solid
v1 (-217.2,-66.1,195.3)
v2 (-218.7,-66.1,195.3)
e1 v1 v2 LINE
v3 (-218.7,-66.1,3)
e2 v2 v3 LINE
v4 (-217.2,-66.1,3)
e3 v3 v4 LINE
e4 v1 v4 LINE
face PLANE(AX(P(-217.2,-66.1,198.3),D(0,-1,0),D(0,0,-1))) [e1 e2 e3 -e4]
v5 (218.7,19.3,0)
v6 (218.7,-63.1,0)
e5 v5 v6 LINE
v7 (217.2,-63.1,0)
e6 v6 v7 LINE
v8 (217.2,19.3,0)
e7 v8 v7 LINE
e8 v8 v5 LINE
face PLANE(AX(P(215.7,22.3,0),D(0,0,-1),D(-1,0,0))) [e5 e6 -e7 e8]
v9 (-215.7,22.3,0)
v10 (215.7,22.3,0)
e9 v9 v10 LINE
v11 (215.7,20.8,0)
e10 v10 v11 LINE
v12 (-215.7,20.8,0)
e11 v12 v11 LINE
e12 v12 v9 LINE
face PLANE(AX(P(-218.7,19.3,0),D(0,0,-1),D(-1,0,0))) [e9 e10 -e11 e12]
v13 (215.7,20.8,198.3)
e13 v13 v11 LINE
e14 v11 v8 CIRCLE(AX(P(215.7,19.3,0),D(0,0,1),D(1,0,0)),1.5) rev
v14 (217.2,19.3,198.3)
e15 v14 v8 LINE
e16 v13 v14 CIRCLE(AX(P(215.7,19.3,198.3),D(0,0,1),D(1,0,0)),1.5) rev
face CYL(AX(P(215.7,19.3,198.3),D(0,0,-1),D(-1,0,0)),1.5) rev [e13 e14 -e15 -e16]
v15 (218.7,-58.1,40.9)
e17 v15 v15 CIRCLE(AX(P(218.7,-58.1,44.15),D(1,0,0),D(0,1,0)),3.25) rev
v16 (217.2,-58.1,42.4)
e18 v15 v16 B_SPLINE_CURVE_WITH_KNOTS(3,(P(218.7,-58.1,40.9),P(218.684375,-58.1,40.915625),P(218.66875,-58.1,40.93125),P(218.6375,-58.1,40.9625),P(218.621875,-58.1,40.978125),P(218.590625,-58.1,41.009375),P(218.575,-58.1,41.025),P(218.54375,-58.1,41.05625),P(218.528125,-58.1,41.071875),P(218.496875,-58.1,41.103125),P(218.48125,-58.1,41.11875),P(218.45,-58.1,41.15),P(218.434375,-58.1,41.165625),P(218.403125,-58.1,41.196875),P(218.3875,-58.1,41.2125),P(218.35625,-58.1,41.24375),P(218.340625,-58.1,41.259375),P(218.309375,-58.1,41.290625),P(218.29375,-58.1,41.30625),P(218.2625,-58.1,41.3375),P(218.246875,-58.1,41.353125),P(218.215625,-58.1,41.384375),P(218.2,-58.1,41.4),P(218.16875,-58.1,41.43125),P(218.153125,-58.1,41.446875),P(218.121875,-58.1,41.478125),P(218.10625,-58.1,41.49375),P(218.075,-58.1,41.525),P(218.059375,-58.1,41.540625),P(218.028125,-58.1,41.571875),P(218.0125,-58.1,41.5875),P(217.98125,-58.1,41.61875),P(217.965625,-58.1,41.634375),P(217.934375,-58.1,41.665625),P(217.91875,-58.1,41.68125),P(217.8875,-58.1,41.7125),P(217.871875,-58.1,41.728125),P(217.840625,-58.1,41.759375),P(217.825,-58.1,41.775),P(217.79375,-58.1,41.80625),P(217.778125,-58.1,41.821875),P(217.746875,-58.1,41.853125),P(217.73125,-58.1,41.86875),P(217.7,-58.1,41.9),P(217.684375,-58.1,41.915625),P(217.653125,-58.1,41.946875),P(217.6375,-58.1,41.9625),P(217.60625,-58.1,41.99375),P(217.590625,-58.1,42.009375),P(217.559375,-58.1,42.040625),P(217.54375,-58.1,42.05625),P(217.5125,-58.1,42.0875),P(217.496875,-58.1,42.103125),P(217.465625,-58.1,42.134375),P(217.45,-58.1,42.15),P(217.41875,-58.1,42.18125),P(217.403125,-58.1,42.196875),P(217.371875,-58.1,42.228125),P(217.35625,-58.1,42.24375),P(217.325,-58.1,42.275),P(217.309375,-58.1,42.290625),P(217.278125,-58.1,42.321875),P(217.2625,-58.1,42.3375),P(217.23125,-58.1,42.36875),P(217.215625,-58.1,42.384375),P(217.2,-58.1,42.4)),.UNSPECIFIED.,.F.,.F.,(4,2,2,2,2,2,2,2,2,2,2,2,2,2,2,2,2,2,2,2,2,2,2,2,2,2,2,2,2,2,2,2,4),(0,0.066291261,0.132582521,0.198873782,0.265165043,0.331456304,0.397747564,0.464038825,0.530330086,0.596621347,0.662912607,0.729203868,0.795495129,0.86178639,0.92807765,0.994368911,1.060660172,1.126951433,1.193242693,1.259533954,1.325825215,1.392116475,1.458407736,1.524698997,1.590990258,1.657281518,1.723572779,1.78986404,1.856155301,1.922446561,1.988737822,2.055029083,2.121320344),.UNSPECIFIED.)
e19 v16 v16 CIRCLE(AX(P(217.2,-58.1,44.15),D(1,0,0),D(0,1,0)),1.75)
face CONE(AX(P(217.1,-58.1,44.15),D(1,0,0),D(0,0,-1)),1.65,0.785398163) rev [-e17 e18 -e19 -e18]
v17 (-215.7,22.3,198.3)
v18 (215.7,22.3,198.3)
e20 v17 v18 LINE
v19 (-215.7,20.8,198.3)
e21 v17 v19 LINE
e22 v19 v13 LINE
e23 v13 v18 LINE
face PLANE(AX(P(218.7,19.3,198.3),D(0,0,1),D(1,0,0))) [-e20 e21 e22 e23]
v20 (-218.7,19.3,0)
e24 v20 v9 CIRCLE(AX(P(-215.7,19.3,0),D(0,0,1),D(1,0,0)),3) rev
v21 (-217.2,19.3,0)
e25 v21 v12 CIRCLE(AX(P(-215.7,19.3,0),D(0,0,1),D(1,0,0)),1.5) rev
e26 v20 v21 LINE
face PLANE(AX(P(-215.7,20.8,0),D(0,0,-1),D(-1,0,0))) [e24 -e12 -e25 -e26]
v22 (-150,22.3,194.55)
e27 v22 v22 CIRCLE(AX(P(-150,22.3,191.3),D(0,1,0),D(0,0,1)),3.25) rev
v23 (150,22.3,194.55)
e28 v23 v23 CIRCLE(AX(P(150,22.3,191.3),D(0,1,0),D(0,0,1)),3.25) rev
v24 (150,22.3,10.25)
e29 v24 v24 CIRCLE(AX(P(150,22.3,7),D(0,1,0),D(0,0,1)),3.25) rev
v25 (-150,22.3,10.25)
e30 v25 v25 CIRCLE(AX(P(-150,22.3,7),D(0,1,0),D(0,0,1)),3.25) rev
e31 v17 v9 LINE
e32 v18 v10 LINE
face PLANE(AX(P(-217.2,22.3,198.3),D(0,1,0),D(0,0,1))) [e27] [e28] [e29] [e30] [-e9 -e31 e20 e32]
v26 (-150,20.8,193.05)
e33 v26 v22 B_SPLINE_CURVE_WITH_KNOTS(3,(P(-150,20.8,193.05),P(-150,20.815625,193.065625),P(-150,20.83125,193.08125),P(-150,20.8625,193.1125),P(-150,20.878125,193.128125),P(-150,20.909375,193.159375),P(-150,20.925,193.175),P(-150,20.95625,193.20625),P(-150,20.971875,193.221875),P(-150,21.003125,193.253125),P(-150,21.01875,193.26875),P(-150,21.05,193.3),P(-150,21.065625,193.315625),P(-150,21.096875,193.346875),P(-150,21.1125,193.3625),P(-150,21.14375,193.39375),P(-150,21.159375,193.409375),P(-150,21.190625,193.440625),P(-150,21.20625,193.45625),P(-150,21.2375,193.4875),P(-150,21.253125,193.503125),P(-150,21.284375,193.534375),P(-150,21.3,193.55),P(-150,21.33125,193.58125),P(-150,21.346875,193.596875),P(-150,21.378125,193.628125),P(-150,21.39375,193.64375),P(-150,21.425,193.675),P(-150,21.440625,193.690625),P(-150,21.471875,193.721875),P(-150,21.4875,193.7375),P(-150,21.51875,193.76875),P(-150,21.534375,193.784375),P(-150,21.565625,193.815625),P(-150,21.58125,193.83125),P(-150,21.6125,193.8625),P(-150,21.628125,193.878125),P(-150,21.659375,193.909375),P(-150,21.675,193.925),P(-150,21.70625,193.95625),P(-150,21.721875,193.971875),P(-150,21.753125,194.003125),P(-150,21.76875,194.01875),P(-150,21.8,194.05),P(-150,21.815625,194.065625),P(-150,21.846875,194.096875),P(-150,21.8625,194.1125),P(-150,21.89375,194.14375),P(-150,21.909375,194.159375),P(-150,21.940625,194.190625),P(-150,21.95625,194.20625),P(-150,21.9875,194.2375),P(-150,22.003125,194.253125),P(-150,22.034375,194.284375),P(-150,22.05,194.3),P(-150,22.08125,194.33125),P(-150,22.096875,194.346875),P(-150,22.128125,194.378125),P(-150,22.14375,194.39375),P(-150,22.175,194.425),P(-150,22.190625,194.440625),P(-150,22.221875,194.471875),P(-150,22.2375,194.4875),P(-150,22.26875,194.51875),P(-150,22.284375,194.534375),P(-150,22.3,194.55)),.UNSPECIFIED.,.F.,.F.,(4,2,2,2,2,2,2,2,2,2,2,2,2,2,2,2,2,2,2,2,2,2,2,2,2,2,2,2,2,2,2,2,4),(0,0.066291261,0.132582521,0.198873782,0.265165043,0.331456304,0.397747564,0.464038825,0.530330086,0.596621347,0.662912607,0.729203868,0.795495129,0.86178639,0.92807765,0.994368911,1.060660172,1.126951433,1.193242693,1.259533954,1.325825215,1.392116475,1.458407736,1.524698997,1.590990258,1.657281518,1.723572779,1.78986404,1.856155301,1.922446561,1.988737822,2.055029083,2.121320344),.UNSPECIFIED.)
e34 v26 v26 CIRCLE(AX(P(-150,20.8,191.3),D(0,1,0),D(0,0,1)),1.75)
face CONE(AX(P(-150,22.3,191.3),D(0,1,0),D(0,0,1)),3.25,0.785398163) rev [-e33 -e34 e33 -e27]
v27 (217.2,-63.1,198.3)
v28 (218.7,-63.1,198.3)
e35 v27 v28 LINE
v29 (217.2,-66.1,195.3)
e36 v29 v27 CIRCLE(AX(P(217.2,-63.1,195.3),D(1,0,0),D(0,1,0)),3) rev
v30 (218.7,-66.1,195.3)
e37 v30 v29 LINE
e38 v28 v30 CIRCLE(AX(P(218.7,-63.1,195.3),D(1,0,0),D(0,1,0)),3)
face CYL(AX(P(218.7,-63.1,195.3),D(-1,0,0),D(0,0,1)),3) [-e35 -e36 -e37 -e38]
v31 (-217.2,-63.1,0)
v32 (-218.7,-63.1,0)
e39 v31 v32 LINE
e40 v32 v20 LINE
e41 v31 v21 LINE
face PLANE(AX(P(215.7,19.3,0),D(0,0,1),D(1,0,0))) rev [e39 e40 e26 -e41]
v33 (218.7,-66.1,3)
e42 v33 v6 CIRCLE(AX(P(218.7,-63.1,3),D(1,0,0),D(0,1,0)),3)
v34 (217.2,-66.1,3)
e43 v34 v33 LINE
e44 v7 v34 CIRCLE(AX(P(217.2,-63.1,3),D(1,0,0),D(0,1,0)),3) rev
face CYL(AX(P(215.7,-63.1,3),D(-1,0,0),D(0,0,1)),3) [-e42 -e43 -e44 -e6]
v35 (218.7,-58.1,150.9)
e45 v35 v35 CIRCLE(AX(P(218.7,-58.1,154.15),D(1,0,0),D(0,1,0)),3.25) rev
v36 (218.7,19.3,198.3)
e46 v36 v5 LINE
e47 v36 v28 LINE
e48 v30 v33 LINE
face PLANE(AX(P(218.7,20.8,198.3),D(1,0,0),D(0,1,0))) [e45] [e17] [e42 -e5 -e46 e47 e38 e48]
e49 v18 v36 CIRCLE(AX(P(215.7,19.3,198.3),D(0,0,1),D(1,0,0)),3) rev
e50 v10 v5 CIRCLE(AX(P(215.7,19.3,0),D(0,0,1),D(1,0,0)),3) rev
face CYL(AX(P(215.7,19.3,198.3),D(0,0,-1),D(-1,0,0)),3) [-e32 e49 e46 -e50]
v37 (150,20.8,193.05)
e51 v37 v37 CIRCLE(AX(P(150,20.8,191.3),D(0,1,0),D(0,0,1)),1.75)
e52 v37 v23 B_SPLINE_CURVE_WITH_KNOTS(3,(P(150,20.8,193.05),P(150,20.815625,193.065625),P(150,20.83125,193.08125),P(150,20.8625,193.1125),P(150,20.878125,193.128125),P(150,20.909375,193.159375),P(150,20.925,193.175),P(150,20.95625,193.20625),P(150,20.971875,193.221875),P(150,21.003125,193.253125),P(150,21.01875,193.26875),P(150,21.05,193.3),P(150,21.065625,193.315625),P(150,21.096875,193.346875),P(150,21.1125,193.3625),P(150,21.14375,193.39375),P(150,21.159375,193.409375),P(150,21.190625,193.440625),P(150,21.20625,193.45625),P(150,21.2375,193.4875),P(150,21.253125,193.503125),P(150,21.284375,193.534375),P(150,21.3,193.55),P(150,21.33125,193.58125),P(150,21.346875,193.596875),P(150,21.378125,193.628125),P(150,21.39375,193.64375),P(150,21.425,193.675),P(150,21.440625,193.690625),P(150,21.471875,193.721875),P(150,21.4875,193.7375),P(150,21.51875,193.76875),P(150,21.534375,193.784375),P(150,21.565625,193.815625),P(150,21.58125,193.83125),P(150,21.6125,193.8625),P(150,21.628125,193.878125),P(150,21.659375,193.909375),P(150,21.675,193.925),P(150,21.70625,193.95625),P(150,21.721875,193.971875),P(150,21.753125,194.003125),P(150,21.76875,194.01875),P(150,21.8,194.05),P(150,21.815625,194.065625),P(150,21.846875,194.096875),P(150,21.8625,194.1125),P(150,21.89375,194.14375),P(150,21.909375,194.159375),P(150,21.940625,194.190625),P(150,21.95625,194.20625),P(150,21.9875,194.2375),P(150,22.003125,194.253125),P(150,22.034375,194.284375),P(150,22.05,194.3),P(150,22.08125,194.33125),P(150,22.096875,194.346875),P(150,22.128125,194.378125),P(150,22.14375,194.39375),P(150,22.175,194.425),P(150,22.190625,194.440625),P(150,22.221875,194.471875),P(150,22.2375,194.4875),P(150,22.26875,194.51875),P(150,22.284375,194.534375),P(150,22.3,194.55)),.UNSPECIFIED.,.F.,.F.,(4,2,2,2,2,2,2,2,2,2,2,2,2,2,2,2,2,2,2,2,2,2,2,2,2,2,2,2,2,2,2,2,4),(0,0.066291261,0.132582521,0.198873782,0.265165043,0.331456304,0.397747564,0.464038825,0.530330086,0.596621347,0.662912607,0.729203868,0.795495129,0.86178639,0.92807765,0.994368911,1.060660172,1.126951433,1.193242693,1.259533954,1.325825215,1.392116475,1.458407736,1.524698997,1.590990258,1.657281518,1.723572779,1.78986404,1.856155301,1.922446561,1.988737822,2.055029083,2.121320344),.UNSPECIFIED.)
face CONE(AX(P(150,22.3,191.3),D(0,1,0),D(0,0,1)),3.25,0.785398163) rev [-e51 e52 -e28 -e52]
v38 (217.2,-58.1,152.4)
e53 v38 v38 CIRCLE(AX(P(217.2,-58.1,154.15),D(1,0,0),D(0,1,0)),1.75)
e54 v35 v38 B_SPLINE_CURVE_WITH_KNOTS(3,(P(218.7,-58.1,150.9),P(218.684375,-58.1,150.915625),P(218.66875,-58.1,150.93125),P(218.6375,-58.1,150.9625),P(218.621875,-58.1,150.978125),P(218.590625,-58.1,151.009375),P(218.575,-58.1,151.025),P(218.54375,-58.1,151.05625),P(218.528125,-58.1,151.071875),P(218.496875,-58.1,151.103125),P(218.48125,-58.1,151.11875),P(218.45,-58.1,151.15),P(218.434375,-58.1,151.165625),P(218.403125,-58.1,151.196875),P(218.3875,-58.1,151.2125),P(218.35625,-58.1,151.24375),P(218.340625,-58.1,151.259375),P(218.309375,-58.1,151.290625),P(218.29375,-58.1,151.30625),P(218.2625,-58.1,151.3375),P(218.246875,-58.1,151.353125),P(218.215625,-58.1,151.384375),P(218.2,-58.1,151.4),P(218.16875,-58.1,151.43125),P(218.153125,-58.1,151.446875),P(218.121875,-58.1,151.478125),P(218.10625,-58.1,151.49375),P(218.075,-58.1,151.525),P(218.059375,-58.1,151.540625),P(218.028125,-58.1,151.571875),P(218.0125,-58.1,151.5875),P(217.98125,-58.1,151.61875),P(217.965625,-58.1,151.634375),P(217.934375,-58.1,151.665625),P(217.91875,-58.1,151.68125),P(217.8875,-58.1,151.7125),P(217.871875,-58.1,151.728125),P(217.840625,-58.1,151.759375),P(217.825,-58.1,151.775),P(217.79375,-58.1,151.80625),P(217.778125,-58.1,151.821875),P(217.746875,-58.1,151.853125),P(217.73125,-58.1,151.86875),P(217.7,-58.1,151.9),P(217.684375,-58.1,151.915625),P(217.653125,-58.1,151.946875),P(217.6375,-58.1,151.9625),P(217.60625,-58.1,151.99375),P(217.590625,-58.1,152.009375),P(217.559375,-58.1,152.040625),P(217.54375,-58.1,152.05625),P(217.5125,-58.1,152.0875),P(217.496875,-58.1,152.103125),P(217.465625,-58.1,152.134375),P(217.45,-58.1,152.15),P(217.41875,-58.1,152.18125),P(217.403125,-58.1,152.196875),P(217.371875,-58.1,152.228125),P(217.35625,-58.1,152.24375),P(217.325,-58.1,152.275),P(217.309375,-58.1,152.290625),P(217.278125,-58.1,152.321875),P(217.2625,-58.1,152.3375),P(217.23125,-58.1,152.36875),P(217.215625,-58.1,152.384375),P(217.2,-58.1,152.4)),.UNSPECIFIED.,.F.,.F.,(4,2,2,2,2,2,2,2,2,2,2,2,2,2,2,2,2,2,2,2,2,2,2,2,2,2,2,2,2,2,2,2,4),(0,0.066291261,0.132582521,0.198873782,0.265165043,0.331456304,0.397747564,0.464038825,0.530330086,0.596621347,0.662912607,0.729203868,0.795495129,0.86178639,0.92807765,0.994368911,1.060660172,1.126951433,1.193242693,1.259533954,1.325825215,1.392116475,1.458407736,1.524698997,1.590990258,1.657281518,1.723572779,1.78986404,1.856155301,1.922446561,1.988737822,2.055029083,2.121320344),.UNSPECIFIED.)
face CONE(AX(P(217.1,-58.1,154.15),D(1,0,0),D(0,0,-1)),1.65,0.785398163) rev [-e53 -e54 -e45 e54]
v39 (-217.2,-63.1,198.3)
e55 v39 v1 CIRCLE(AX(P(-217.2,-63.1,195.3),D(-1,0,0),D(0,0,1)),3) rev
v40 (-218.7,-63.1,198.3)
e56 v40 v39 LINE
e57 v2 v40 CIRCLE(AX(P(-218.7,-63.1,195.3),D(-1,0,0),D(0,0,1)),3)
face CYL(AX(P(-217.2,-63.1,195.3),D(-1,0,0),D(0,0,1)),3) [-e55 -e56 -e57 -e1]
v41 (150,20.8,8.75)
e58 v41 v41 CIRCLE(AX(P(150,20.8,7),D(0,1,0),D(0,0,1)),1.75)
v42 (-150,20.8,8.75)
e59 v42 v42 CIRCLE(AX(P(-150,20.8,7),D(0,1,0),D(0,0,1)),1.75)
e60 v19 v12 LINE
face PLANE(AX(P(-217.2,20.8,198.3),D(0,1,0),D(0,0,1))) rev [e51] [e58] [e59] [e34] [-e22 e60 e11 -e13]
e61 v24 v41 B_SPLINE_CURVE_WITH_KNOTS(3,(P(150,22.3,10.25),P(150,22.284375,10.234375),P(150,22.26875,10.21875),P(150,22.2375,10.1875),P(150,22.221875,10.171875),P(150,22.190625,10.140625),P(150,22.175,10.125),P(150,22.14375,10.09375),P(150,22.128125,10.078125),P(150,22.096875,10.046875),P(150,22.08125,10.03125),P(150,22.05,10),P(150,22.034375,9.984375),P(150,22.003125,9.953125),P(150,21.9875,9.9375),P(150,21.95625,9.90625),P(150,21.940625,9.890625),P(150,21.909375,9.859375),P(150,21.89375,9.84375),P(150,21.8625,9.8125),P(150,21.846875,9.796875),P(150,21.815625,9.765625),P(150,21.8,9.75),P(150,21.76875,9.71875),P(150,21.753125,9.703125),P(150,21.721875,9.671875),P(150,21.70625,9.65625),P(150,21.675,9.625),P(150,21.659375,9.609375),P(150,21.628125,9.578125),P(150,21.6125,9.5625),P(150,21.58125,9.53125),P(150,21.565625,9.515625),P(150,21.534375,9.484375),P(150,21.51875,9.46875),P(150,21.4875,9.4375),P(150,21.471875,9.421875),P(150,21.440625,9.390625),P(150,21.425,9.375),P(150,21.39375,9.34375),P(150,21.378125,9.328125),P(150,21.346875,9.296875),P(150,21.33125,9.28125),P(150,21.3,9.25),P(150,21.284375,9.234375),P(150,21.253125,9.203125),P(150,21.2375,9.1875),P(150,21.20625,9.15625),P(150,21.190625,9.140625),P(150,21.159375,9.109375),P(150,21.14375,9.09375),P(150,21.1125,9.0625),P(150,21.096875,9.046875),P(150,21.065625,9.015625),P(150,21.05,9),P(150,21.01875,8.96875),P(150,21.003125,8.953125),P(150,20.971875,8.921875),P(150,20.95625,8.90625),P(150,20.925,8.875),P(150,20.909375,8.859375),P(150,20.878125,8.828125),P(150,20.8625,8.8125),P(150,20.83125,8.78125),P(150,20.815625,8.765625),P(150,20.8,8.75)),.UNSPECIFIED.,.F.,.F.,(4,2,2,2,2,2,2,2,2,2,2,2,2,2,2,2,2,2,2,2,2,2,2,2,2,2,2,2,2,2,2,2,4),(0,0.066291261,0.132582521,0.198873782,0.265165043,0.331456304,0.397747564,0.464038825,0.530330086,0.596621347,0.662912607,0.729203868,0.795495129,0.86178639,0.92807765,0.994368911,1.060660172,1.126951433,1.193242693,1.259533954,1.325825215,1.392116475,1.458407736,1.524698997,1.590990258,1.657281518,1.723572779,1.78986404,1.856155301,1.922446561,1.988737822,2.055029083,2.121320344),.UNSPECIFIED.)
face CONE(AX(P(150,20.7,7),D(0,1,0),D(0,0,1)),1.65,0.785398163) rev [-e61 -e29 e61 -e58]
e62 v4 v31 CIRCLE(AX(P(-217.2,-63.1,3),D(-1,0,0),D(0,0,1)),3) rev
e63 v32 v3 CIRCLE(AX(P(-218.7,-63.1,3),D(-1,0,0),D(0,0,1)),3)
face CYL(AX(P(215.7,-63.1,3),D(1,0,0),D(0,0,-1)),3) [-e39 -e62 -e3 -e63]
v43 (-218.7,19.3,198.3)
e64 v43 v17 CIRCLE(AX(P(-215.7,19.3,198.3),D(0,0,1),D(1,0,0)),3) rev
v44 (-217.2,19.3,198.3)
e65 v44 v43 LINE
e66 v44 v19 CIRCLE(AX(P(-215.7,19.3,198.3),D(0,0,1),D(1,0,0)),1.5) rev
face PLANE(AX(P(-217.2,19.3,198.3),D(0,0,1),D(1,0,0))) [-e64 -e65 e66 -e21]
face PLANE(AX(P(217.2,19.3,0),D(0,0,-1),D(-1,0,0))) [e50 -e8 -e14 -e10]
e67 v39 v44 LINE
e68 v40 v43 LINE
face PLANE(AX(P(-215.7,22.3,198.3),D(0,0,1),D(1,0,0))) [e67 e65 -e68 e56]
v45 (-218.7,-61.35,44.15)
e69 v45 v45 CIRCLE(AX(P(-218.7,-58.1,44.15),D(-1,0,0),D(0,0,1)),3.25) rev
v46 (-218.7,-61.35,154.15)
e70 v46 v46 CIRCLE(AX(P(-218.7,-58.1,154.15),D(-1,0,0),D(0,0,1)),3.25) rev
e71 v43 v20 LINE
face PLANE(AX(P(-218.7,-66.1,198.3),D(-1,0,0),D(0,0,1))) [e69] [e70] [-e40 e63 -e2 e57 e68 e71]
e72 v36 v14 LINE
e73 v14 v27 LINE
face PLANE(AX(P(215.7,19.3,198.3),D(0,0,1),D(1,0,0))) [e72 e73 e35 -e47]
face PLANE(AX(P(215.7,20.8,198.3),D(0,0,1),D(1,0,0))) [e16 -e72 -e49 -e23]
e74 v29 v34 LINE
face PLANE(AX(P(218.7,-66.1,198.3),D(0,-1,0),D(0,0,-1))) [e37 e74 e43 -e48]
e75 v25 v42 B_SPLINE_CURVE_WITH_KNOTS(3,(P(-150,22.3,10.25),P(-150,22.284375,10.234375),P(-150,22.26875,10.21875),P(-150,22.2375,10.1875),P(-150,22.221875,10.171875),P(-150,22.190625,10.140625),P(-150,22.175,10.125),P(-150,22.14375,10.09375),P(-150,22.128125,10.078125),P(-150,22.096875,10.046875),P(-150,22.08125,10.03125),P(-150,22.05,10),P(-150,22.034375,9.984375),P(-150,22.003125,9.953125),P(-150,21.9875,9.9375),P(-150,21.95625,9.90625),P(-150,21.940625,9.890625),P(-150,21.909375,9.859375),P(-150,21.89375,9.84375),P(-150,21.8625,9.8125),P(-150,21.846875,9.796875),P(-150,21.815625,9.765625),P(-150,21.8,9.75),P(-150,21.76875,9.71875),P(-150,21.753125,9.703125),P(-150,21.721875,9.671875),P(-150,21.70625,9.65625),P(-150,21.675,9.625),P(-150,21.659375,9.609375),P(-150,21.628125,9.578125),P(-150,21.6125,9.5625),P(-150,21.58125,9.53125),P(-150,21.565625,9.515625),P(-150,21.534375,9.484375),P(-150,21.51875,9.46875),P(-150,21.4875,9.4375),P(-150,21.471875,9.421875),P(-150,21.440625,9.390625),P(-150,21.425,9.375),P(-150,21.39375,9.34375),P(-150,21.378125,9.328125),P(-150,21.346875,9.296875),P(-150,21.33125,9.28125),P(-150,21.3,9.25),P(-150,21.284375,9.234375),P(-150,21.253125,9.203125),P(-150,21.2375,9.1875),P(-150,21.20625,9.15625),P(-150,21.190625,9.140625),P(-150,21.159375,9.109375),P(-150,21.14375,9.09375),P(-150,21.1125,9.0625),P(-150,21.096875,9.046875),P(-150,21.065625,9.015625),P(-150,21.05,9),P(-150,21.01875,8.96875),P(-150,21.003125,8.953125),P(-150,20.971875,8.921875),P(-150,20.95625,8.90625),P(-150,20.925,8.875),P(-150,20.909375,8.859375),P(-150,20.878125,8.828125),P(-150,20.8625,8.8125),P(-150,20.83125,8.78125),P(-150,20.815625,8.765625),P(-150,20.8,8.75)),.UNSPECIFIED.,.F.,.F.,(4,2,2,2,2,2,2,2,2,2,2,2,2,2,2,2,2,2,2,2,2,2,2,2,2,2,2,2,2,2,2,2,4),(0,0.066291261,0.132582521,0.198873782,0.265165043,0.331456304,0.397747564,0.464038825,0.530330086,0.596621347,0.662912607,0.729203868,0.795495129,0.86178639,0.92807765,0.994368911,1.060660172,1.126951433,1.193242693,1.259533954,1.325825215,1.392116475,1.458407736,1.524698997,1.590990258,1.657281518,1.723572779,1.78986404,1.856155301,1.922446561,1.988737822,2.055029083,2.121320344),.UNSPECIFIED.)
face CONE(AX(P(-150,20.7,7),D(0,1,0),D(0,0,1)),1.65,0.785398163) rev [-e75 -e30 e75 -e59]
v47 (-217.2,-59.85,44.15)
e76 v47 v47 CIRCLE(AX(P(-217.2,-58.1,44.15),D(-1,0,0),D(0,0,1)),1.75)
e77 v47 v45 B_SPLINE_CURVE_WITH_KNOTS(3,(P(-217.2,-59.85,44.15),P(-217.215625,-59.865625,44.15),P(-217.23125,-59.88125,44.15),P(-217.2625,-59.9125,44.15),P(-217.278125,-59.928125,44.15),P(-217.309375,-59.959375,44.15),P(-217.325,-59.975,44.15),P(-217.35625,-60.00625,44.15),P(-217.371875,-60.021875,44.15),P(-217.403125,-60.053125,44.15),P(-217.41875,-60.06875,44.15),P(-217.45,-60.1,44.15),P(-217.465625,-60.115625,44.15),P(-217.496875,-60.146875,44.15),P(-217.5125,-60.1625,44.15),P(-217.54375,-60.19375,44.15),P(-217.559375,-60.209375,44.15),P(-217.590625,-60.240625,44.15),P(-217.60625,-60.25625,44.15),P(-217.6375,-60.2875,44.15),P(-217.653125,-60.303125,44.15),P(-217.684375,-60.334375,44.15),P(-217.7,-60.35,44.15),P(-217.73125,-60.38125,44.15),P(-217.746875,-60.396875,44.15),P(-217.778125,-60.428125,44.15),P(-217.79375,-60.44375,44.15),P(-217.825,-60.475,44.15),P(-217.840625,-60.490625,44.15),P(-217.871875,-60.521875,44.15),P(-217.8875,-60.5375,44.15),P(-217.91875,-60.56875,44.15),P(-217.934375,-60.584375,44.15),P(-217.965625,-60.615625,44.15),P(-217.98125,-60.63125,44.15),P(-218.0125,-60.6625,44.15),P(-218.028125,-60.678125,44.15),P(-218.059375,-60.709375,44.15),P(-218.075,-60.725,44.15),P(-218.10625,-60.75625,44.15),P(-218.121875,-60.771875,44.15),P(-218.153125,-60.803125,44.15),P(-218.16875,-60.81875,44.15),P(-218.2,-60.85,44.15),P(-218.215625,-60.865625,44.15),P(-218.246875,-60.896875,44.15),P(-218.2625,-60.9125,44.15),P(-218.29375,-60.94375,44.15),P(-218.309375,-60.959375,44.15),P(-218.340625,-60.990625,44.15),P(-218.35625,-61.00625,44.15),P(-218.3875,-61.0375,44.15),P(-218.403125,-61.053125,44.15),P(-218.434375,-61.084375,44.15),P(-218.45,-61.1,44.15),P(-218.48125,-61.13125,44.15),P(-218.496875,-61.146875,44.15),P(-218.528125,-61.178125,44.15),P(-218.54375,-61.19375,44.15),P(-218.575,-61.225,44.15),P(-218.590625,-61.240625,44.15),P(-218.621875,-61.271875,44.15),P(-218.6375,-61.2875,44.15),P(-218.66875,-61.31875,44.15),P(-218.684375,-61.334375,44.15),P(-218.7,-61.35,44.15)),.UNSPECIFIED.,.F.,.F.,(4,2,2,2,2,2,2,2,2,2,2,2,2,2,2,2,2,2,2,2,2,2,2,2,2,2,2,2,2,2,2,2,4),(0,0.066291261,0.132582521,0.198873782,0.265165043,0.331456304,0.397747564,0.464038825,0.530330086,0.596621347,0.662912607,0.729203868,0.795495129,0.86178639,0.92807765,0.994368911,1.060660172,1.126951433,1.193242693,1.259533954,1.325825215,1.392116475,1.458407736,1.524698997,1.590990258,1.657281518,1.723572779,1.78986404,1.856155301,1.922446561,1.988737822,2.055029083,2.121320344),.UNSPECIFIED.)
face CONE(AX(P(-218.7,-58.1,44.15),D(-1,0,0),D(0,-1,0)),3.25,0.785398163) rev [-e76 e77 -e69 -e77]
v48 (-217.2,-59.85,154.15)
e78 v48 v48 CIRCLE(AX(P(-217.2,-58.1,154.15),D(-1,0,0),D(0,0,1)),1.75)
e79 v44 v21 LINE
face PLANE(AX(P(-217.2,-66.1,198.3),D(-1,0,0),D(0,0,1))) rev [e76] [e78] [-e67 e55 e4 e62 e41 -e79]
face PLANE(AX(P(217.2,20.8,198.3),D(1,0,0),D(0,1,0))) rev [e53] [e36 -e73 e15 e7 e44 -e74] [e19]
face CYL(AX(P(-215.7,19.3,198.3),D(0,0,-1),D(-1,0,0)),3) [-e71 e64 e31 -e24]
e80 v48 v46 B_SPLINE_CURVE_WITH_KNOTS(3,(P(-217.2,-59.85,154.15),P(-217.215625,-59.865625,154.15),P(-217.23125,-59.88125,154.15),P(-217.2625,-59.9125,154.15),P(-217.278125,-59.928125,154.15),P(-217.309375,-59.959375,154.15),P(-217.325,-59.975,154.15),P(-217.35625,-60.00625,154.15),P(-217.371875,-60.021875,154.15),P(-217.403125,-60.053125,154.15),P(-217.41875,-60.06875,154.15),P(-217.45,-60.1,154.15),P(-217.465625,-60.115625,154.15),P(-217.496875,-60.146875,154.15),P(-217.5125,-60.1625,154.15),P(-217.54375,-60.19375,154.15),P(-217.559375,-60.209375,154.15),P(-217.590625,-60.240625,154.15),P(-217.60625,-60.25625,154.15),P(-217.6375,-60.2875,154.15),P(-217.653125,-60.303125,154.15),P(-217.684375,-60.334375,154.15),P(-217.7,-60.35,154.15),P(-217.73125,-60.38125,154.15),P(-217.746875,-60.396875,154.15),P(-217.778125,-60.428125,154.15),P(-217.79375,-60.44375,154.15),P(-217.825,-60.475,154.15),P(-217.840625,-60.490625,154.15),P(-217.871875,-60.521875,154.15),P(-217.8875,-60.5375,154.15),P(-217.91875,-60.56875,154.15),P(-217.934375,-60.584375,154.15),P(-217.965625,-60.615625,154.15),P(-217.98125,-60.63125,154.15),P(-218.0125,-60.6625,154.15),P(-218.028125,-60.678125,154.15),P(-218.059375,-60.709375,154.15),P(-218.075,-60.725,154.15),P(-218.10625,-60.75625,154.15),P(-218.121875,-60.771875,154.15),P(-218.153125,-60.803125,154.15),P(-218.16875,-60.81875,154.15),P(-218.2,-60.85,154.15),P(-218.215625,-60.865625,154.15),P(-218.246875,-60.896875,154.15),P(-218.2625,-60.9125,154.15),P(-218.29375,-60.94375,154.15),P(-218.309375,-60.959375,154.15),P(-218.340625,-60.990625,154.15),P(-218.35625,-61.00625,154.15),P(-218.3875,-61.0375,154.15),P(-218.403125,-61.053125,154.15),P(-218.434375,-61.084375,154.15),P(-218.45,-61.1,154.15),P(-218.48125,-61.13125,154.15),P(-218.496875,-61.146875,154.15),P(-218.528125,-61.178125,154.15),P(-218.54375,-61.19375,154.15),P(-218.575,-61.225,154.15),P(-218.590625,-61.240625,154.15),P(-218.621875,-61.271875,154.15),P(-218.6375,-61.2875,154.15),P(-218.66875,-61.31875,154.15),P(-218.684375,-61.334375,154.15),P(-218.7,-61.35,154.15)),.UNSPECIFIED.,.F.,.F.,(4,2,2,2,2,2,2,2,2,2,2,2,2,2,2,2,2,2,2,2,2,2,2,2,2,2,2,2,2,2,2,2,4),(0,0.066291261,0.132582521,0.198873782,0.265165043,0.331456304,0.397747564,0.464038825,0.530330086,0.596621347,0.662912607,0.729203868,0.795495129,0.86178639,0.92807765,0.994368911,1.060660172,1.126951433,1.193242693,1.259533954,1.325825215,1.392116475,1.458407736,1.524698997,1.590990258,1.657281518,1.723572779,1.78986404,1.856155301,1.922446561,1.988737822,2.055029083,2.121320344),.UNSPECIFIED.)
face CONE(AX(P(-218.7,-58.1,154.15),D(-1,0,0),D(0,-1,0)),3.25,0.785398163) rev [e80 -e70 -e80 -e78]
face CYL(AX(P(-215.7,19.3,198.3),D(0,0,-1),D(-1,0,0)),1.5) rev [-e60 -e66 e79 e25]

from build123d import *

# Parameters (mm, degrees)
SM_BASE_FLANGE_1_DEPTH = 198.3
FILLET_1_R             = 3
SKETCH_6_R             = 1.65
CUT_EXTRUDE_1_DEPTH    = 309.167389579
CUT_EXTRUDE_2_REACH    = 486.779
SKETCH_7_R             = 1.65
CHAMFER_2_SIZE         = 1.6


# Sheet-metal steps are written as plain solids
with BuildPart() as part:
    # Sketch 1 → Базовая кромка1 (new body)
    with BuildSketch(Plane.XY):
        with BuildLine():
            Line((-217.2, -66.1), (-217.2, 19.3))
            ThreePointArc((-217.2, 19.3), (-216.760660172, 20.360660172), (-215.7, 20.8))
            Line((-215.7, 20.8), (215.7, 20.8))
            ThreePointArc((215.7, 20.8), (216.760660172, 20.360660172), (217.2, 19.3))
            Line((217.2, 19.3), (217.2, -66.1))
            Line((217.2, -66.1), (218.7, -66.1))
            Line((218.7, -66.1), (218.7, 19.3))
            ThreePointArc((218.7, 19.3), (217.821320344, 21.421320344), (215.7, 22.3))
            Line((215.7, 22.3), (-215.7, 22.3))
            ThreePointArc((-215.7, 22.3), (-217.821320344, 21.421320344), (-218.7, 19.3))
            Line((-218.7, 19.3), (-218.7, -66.1))
            Line((-218.7, -66.1), (-217.2, -66.1))
        make_face()
    extrude(amount=SM_BASE_FLANGE_1_DEPTH)

    # Скругление1
    fillet_1_edges = [part.edges().sort_by_distance(p)[0] for p in [
        (-217.95, -66.1, 0),
        (217.95, -66.1, 0),
        (-217.95, -66.1, 198.3),
        (217.95, -66.1, 198.3),
    ]]
    fillet(fillet_1_edges, radius=FILLET_1_R)

    # Эскиз6 → Вырез-Вытянуть1 (cut, through all)
    with BuildSketch(Plane(origin=(0, 22.3, 0), x_dir=(1, 0, 0), z_dir=(0, 1, 0))):
        with Locations(Location((-150, -7, 0), (0, 0, 270))):
            Circle(SKETCH_6_R)
        with Locations(Location((150, -7, 0), (0, 0, 270))):
            Circle(SKETCH_6_R)
    cut_extrude_1 = extrude(amount=-CUT_EXTRUDE_1_DEPTH, mode=Mode.SUBTRACT)

    # Зеркальное отражение1: Вырез-Вытянуть1 across plane
    add(cut_extrude_1.mirror(Plane(origin=(0, 0, 99.15), x_dir=(1, 0, 0), z_dir=(0, 0, -1))), mode=Mode.SUBTRACT)

    # Вырез-Вытянуть2: up to this face of the body (flat: up to its plane)
    cut_extrude_2_end = Plane(part.part.faces().sort_by_distance((-218.7, -23.390410792, 99.15))[0])
    # Эскиз7 → Вырез-Вытянуть2 (cut, up to the picked face)
    with BuildSketch(Plane(origin=(218.7, 0, 0), x_dir=(0, 0, -1), z_dir=(1, 0, 0)), mode=Mode.PRIVATE) as cut_extrude_2_sk1:
        with Locations(Location((-154.15, -58.1, 0), (0, 0, 90))):
            Circle(SKETCH_7_R)
    cut_extrude_2_tool1 = split(extrude(cut_extrude_2_sk1.sketch, amount=-CUT_EXTRUDE_2_REACH, mode=Mode.PRIVATE), bisect_by=cut_extrude_2_end, keep=Keep.BOTH, mode=Mode.PRIVATE)
    # Эскиз7 → Вырез-Вытянуть2 (cut, up to the picked face)
    with BuildSketch(Plane(origin=(218.7, 0, 0), x_dir=(0, 0, -1), z_dir=(1, 0, 0)), mode=Mode.PRIVATE) as cut_extrude_2_sk2:
        with Locations(Location((-44.15, -58.1, 0), (0, 0, 90))):
            Circle(SKETCH_7_R)
    cut_extrude_2_tool2 = split(extrude(cut_extrude_2_sk2.sketch, amount=-CUT_EXTRUDE_2_REACH, mode=Mode.PRIVATE), bisect_by=cut_extrude_2_end, keep=Keep.BOTH, mode=Mode.PRIVATE)
    add(cut_extrude_2_tool1.solids().sort_by(Axis((218.7, -58.1, 154.15), (-1, 0, 0)))[0], mode=Mode.SUBTRACT)
    add(cut_extrude_2_tool2.solids().sort_by(Axis((218.7, -58.1, 44.15), (-1, 0, 0)))[0], mode=Mode.SUBTRACT)

    # Фаска2
    # the kernel refuses this chamfer: 1.6 mm, written as the material it takes off along each edge
    with BuildSketch(Plane(origin=(-218.7, -58.1, 44.15), x_dir=(0, 1, 0), z_dir=(0, 0, -1))) as chamfer_2_piece_1:
        Polygon((1.65 + CHAMFER_2_SIZE, 0), (1.65, CHAMFER_2_SIZE), (1.65, 0), align=None)
    revolve(axis=Axis((-218.7, -58.1, 44.15), (1, 0, 0)), mode=Mode.SUBTRACT)
    with BuildSketch(Plane(origin=(-218.7, -58.1, 154.15), x_dir=(0, 1, 0), z_dir=(0, 0, -1))) as chamfer_2_piece_2:
        Polygon((1.65 + CHAMFER_2_SIZE, 0), (1.65, CHAMFER_2_SIZE), (1.65, 0), align=None)
    revolve(axis=Axis((-218.7, -58.1, 154.15), (1, 0, 0)), mode=Mode.SUBTRACT)
    with BuildSketch(Plane(origin=(-150, 22.3, 191.3), x_dir=(0, 0, -1), z_dir=(-1, 0, 0))) as chamfer_2_piece_3:
        Polygon((1.65 + CHAMFER_2_SIZE, 0), (1.65, CHAMFER_2_SIZE), (1.65, 0), align=None)
    revolve(axis=Axis((-150, 22.3, 191.3), (0, -1, 0)), mode=Mode.SUBTRACT)
    with BuildSketch(Plane(origin=(-150, 22.3, 7), x_dir=(0, 0, 1), z_dir=(-1, 0, 0))) as chamfer_2_piece_4:
        Polygon((1.65 + CHAMFER_2_SIZE, 0), (1.65, -CHAMFER_2_SIZE), (1.65, 0), align=None)
    revolve(axis=Axis((-150, 22.3, 7), (0, 1, 0)), mode=Mode.SUBTRACT)
    with BuildSketch(Plane(origin=(150, 22.3, 7), x_dir=(0, 0, 1), z_dir=(-1, 0, 0))) as chamfer_2_piece_5:
        Polygon((1.65 + CHAMFER_2_SIZE, 0), (1.65, -CHAMFER_2_SIZE), (1.65, 0), align=None)
    revolve(axis=Axis((150, 22.3, 7), (0, 1, 0)), mode=Mode.SUBTRACT)
    with BuildSketch(Plane(origin=(218.7, -58.1, 44.15), x_dir=(0, 1, 0), z_dir=(0, 0, -1))) as chamfer_2_piece_6:
        Polygon((1.65 + CHAMFER_2_SIZE, 0), (1.65, -CHAMFER_2_SIZE), (1.65, 0), align=None)
    revolve(axis=Axis((218.7, -58.1, 44.15), (1, 0, 0)), mode=Mode.SUBTRACT)
    with BuildSketch(Plane(origin=(218.7, -58.1, 154.15), x_dir=(0, 1, 0), z_dir=(0, 0, -1))) as chamfer_2_piece_7:
        Polygon((1.65 + CHAMFER_2_SIZE, 0), (1.65, -CHAMFER_2_SIZE), (1.65, 0), align=None)
    revolve(axis=Axis((218.7, -58.1, 154.15), (1, 0, 0)), mode=Mode.SUBTRACT)
    with BuildSketch(Plane(origin=(150, 22.3, 191.3), x_dir=(0, 0, -1), z_dir=(-1, 0, 0))) as chamfer_2_piece_8:
        Polygon((1.65 + CHAMFER_2_SIZE, 0), (1.65, CHAMFER_2_SIZE), (1.65, 0), align=None)
    revolve(axis=Axis((150, 22.3, 191.3), (0, -1, 0)), mode=Mode.SUBTRACT)


solid = part.part
